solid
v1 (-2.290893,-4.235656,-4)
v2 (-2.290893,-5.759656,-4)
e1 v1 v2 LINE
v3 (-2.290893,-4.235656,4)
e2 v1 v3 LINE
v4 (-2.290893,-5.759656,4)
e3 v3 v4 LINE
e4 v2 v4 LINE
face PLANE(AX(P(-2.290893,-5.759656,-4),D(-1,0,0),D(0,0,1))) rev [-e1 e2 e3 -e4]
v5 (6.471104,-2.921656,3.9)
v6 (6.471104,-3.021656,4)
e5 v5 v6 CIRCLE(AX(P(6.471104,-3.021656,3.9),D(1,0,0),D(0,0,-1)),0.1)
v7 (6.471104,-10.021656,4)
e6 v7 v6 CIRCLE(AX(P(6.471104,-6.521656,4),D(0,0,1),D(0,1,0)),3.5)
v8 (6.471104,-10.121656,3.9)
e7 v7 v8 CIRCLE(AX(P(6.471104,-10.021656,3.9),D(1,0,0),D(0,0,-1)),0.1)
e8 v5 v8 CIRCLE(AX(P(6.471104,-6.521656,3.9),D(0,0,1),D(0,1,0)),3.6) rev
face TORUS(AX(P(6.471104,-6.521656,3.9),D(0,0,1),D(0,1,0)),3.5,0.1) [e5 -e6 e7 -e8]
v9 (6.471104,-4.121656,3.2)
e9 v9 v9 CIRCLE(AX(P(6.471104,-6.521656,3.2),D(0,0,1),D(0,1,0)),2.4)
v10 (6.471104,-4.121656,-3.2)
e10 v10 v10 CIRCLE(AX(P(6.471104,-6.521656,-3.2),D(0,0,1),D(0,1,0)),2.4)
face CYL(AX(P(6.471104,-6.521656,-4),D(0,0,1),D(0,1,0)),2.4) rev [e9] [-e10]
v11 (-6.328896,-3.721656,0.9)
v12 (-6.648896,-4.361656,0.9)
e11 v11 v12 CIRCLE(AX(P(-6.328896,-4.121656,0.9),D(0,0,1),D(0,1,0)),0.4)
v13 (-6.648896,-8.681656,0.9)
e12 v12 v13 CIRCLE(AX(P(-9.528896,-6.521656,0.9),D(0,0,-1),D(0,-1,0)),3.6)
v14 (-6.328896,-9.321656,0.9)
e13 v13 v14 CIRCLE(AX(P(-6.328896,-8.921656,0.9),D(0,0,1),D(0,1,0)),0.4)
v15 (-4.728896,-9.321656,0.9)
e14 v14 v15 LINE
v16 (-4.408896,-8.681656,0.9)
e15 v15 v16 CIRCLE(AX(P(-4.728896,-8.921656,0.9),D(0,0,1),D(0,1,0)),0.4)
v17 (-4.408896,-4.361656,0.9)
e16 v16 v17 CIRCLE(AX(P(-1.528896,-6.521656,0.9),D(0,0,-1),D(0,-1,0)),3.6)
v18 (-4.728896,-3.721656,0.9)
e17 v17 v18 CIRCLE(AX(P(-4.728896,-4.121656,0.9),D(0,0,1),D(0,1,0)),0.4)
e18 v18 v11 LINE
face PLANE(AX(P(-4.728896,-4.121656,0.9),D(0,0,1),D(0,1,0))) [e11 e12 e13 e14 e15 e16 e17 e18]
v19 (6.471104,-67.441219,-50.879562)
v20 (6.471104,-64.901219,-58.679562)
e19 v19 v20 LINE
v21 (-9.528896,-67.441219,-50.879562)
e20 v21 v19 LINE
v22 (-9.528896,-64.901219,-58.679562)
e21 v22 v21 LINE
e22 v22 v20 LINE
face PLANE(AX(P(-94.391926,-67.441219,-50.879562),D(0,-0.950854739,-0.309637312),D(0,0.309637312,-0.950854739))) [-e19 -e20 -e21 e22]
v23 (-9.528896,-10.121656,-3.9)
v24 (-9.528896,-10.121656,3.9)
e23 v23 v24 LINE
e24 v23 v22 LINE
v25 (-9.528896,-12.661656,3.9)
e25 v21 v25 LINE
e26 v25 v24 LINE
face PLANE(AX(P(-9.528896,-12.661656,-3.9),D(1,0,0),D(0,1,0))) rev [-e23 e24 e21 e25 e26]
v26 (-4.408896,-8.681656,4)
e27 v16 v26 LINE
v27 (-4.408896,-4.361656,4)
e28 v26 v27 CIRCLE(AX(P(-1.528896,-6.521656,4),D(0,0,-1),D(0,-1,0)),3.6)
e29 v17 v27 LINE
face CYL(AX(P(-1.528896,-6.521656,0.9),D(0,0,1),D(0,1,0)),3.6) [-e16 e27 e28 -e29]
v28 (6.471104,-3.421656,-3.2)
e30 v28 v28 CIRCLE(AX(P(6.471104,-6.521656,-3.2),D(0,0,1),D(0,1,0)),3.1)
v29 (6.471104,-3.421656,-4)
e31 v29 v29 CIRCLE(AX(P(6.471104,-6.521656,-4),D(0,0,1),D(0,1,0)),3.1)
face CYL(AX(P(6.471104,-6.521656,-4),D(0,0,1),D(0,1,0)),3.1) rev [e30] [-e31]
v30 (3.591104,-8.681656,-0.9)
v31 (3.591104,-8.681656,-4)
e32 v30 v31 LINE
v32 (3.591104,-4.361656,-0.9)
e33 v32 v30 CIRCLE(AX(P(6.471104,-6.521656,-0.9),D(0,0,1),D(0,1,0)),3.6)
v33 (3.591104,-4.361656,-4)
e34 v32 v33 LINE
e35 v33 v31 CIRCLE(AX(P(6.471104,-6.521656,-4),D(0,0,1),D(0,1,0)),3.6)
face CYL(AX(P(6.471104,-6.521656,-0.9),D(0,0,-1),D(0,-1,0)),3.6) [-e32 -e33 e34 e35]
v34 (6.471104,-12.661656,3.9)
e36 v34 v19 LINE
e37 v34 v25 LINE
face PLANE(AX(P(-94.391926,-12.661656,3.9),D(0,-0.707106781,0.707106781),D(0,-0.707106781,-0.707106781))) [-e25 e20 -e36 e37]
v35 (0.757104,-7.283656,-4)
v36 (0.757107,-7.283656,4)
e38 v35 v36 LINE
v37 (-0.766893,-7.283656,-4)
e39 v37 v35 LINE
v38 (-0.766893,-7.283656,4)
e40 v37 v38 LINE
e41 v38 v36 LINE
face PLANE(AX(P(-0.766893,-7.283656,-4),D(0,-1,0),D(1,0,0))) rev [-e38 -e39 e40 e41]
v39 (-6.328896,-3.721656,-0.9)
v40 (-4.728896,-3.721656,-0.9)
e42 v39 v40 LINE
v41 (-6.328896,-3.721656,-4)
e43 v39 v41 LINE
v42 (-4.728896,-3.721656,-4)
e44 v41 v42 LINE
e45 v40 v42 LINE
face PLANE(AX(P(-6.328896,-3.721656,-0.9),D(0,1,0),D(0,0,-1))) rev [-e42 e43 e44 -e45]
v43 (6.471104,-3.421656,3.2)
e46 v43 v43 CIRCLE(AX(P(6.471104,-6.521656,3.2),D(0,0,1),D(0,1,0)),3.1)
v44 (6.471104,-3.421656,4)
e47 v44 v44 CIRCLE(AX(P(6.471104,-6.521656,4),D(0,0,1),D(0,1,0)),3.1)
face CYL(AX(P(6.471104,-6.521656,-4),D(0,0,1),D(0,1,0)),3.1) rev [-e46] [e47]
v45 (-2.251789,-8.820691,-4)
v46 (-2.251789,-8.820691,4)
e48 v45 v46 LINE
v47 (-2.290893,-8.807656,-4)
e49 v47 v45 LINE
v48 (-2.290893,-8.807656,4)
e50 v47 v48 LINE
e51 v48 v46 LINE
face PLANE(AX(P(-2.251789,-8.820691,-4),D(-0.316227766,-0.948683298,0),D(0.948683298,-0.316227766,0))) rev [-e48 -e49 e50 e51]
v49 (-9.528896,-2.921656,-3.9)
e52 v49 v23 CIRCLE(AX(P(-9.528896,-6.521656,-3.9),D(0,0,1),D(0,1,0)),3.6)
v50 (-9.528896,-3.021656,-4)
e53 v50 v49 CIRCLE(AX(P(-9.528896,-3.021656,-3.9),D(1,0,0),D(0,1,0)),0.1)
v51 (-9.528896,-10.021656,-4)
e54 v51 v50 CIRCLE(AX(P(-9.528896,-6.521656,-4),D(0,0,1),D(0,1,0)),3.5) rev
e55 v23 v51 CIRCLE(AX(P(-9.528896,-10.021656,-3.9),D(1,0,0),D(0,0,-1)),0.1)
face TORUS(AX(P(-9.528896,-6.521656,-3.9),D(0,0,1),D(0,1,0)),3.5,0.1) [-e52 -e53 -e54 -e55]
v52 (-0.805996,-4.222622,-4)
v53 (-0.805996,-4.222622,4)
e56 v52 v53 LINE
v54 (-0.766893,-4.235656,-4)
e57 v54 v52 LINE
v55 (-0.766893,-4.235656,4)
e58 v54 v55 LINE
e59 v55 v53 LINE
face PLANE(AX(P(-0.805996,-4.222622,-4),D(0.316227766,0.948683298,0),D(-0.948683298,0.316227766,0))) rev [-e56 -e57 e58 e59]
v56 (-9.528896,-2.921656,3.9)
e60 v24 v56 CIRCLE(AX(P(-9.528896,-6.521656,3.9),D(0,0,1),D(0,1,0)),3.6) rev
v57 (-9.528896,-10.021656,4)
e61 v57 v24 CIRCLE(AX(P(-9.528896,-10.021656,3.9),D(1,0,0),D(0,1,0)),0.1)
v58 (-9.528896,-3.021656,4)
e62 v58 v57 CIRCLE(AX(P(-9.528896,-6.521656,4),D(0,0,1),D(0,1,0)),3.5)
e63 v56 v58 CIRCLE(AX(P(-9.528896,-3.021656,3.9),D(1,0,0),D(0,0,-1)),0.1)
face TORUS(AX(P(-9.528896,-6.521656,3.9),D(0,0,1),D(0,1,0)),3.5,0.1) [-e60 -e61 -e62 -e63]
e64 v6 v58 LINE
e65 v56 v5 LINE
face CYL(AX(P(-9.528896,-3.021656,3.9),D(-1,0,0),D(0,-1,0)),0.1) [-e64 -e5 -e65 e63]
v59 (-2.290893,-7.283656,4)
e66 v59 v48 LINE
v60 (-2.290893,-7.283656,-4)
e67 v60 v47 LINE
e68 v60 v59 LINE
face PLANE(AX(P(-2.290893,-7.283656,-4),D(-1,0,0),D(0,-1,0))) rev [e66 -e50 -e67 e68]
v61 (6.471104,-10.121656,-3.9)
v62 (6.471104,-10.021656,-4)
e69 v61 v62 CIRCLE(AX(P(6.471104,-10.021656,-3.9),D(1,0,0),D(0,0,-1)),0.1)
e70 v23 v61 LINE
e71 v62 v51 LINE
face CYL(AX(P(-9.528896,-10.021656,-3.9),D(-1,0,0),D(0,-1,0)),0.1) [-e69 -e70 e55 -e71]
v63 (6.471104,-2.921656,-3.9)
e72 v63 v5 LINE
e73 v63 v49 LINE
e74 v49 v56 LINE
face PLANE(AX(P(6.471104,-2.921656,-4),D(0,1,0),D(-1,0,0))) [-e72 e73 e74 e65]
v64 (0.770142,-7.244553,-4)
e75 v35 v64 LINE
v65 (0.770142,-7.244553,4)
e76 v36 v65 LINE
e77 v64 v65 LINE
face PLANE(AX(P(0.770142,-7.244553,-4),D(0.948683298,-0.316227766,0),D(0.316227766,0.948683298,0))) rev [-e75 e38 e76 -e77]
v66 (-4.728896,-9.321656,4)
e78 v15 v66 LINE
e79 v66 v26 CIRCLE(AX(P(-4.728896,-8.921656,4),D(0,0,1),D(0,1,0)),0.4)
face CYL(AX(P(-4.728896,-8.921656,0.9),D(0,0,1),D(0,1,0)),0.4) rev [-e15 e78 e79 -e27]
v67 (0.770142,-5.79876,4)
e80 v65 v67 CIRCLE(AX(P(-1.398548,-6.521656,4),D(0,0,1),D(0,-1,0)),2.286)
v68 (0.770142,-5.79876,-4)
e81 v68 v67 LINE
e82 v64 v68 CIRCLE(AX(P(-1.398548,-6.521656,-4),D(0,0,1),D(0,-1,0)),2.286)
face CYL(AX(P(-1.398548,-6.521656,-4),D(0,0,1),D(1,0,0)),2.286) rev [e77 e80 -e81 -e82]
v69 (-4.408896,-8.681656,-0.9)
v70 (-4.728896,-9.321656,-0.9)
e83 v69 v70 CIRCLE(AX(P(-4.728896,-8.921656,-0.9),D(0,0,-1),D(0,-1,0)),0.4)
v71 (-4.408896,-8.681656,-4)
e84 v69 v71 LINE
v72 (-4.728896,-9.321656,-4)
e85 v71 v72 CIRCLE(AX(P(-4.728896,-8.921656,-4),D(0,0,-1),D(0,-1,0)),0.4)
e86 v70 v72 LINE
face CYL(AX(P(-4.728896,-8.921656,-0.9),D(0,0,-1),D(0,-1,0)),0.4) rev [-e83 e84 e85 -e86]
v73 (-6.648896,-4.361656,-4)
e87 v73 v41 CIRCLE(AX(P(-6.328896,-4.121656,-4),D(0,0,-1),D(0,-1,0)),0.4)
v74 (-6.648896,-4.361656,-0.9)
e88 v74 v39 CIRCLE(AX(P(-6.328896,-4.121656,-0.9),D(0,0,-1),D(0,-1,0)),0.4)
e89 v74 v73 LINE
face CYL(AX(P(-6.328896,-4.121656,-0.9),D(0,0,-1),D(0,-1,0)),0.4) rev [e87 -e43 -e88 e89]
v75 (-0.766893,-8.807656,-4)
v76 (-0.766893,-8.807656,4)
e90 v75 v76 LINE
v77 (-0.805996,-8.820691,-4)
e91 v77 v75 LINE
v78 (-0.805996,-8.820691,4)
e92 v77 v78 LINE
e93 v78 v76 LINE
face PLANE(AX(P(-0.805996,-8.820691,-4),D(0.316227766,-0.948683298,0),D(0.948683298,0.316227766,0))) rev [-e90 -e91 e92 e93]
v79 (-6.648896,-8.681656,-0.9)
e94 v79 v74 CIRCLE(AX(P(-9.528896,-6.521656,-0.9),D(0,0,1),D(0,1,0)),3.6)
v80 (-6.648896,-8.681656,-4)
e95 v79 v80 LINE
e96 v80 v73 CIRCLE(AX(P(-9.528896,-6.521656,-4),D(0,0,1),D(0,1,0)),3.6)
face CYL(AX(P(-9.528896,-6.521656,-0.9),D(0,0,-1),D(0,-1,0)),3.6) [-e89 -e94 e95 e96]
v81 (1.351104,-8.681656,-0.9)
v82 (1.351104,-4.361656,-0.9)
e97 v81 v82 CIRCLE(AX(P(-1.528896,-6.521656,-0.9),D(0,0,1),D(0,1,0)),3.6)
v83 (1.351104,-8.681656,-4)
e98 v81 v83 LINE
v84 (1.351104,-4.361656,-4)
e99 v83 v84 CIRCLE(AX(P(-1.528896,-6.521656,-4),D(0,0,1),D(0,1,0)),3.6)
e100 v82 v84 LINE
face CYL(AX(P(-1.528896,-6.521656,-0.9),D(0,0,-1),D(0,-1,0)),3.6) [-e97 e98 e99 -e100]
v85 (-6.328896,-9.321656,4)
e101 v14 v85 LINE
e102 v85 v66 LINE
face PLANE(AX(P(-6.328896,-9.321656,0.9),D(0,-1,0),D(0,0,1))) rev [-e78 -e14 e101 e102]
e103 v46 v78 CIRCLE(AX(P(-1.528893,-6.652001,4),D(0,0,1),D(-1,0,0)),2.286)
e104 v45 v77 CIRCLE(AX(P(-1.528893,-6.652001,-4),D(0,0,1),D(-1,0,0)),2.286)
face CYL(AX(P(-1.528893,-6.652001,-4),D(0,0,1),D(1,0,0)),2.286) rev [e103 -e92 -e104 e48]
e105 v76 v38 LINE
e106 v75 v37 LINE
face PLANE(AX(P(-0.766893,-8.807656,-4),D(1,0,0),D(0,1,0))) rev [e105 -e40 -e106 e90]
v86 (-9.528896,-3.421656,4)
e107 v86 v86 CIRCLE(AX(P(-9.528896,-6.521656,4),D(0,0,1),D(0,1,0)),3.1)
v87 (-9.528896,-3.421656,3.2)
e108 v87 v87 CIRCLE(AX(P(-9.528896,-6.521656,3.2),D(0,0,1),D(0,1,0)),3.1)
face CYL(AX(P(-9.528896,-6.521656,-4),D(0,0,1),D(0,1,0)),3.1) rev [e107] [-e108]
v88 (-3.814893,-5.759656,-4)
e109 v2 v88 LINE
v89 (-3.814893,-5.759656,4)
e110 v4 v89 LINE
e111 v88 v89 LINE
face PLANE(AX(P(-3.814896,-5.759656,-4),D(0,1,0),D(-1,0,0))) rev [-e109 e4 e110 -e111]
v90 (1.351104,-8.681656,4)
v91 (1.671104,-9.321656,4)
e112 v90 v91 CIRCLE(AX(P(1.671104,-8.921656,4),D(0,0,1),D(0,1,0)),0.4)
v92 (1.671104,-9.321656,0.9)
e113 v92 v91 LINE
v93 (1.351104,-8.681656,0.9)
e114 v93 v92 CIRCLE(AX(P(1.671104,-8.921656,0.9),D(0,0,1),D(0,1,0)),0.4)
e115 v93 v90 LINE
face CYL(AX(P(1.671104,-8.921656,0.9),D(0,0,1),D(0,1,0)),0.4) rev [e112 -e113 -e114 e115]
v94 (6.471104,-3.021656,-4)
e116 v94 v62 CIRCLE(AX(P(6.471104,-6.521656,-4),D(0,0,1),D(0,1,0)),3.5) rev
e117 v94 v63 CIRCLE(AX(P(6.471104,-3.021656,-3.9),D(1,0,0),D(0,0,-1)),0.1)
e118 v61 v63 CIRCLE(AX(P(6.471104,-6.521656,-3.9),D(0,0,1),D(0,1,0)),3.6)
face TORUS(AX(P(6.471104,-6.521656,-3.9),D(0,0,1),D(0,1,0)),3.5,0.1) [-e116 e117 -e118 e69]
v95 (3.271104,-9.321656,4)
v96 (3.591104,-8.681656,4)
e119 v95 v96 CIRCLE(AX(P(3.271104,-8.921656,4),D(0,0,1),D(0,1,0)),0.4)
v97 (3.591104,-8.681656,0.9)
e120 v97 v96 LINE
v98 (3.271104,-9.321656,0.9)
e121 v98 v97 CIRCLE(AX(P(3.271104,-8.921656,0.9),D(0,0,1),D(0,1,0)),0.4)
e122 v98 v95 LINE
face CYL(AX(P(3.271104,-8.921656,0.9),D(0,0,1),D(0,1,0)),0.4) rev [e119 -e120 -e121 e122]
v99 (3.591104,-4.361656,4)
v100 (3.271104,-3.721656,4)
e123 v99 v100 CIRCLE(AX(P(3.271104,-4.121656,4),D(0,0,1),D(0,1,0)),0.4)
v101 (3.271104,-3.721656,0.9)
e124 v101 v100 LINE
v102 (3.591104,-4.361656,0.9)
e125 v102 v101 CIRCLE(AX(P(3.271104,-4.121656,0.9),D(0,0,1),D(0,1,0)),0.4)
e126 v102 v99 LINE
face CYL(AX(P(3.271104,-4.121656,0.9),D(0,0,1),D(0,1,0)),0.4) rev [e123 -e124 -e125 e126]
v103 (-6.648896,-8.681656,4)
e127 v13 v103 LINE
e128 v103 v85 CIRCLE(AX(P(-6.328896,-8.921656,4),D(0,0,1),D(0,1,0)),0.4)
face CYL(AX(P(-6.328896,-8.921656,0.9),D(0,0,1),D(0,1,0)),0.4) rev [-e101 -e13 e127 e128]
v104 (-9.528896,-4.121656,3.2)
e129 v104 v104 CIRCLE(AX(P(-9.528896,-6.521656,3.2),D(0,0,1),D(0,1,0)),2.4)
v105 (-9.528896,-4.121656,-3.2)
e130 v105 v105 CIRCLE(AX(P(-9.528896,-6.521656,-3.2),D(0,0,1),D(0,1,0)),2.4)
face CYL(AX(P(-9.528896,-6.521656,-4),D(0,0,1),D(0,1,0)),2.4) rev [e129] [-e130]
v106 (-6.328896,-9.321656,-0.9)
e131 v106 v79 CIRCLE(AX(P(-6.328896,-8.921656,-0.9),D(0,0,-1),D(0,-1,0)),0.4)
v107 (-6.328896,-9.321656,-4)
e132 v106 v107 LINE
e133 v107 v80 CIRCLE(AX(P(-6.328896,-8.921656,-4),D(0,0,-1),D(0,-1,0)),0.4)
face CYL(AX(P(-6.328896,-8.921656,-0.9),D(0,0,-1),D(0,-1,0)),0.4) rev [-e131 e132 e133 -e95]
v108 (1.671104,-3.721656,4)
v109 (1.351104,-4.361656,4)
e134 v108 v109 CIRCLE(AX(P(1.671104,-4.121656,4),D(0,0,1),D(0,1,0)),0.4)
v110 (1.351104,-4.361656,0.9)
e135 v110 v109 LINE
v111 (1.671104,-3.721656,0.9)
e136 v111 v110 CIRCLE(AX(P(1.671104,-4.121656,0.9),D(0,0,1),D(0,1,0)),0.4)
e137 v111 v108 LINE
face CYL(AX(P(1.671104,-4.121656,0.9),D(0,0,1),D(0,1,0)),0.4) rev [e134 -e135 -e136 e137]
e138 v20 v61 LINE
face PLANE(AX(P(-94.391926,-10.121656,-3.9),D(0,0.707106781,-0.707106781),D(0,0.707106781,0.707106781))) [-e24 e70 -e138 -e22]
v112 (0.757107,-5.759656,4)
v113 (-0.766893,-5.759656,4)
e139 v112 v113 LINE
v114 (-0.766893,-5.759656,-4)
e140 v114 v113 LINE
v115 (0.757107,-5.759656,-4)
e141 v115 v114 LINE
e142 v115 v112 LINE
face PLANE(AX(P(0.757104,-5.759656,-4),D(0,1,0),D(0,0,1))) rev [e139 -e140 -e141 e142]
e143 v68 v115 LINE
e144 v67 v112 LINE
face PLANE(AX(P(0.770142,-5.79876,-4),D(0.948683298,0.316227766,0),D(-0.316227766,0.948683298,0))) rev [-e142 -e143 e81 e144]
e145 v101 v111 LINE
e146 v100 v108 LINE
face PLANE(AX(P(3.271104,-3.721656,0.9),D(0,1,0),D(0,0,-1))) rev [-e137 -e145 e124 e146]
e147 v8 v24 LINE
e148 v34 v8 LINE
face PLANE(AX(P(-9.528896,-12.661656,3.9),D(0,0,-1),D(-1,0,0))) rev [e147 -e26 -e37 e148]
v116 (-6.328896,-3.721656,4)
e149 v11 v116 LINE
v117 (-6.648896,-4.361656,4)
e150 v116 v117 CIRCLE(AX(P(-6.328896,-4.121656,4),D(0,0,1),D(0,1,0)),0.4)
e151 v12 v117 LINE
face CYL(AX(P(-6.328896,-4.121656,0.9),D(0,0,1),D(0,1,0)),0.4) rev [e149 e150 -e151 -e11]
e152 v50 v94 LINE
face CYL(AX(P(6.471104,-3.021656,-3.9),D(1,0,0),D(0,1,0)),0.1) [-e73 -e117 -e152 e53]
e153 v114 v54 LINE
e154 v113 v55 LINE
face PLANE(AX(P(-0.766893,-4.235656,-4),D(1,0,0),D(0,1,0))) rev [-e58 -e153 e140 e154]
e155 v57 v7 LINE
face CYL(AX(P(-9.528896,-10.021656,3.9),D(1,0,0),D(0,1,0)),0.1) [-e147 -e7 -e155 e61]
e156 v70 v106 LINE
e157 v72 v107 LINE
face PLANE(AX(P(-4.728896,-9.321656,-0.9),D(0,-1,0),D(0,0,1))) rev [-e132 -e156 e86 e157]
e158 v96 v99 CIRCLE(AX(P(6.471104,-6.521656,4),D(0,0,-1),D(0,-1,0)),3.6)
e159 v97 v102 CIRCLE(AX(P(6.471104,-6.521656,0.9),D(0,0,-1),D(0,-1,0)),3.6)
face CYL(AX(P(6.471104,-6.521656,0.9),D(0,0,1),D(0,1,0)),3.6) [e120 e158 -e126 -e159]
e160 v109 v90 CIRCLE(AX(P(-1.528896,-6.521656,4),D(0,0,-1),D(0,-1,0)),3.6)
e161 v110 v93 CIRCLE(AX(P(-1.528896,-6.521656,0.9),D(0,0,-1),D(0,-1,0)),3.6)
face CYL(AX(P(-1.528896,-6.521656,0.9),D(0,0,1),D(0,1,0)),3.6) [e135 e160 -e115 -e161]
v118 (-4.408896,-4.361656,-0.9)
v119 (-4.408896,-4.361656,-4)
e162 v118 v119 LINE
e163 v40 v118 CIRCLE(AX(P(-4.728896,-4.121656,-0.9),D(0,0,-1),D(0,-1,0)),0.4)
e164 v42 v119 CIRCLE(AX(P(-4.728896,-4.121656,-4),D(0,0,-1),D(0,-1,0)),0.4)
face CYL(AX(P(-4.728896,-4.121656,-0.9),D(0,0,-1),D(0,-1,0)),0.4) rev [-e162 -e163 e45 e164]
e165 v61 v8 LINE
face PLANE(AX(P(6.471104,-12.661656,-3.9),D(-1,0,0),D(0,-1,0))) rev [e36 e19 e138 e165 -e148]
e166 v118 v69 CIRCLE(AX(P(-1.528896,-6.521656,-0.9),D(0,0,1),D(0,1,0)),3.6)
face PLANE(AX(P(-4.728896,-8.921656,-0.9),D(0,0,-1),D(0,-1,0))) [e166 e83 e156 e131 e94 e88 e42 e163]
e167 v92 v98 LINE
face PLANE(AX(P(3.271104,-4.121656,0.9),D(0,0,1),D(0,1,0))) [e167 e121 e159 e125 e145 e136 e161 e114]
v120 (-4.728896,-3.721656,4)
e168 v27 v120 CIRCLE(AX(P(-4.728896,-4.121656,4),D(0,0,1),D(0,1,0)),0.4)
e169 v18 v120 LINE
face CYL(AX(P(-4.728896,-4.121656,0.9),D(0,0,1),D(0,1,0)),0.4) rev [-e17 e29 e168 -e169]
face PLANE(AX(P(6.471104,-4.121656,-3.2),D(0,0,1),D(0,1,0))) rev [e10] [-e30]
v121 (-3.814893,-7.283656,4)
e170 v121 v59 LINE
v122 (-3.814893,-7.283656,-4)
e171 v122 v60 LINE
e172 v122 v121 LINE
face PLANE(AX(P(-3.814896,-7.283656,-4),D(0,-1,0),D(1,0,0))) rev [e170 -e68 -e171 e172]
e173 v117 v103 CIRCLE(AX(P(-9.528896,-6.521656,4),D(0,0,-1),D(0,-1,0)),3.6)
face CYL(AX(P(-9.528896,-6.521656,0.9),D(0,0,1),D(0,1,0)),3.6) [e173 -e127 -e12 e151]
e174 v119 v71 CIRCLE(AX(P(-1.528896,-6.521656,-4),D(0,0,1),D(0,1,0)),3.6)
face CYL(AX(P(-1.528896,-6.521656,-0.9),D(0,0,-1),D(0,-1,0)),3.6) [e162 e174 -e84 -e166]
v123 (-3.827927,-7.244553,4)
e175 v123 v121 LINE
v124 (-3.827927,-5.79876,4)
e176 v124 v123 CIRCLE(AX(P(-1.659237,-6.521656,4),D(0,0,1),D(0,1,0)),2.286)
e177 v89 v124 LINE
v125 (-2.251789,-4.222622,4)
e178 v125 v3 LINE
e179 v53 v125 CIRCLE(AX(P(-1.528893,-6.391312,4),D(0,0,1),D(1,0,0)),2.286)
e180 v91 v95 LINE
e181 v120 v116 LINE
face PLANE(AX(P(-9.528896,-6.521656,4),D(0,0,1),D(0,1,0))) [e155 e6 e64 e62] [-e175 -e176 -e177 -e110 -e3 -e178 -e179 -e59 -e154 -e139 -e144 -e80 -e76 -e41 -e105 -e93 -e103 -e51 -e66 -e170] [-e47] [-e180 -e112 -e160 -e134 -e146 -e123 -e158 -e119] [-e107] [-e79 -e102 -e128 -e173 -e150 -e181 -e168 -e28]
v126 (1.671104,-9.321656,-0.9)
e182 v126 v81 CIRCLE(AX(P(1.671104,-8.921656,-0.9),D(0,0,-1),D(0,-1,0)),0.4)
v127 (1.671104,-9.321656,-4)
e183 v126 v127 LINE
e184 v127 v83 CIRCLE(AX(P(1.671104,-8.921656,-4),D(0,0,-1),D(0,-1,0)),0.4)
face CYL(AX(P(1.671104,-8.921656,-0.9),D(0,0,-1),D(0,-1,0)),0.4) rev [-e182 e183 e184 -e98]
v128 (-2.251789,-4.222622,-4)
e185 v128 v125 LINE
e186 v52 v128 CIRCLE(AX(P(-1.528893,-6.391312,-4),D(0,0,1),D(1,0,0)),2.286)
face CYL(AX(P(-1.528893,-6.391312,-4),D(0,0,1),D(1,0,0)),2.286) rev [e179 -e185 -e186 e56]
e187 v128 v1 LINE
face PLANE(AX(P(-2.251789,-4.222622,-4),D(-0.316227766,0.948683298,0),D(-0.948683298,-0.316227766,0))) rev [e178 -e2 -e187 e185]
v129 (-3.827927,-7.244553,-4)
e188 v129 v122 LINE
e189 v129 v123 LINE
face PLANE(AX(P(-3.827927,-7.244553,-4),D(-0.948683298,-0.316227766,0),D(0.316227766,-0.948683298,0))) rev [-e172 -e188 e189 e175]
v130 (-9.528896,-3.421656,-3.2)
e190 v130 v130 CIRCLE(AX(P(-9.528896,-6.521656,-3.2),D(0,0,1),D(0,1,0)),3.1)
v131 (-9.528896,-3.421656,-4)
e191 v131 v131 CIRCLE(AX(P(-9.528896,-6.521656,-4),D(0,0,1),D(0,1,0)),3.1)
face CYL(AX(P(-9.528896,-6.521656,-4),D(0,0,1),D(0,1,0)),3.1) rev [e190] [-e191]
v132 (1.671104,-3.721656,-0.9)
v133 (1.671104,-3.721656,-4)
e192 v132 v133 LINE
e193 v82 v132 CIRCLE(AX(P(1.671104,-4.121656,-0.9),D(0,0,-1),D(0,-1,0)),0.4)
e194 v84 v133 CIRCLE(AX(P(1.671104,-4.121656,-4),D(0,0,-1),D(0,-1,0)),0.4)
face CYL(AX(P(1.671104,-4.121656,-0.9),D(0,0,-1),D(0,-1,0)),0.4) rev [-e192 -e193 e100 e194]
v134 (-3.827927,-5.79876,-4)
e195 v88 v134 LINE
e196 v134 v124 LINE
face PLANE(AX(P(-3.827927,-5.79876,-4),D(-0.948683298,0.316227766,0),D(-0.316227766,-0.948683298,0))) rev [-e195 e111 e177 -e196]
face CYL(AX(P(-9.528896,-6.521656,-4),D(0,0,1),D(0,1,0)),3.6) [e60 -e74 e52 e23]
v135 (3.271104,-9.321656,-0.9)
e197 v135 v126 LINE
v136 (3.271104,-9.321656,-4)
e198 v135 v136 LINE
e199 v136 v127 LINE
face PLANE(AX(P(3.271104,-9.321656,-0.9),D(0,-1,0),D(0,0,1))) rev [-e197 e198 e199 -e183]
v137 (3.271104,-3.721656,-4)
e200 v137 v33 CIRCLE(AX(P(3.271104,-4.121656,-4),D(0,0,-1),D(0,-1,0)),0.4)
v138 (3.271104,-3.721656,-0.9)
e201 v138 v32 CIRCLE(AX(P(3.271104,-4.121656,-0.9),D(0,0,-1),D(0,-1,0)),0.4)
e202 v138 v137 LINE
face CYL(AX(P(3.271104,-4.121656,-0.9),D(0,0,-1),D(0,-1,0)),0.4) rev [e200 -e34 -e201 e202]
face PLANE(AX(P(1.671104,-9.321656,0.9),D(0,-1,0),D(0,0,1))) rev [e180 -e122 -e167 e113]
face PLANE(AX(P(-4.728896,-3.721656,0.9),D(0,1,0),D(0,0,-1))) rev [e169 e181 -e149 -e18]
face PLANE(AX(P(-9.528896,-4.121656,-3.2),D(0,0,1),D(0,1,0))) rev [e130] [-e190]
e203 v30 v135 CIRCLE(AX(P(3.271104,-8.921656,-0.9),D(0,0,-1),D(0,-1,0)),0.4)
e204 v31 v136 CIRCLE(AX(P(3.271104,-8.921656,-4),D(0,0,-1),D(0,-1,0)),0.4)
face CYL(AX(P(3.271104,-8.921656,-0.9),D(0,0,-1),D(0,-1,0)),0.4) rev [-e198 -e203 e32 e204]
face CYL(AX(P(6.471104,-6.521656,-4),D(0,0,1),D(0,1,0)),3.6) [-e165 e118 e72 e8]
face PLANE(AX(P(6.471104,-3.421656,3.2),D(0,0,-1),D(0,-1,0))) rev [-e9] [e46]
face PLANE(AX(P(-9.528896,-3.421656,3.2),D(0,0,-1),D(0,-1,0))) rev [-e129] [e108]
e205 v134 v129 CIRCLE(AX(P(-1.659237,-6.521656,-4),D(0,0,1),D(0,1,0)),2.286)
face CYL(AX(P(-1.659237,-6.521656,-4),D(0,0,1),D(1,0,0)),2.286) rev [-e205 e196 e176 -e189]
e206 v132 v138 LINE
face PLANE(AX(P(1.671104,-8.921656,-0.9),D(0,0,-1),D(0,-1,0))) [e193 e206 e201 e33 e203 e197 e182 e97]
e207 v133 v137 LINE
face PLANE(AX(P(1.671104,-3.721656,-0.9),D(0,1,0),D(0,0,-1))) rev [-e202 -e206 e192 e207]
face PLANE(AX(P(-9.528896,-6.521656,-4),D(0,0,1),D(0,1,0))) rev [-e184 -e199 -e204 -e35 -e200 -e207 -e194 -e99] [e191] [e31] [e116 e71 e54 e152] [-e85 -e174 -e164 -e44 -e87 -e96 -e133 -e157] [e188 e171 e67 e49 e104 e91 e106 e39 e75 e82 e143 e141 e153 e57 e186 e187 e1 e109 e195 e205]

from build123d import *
from OCP.BRepAlgoAPI import BRepAlgoAPI_Cut
from OCP.TopTools import TopTools_ListOfShape

# Parameters (mm, degrees)
BOSS_EXTRUDE1_DEPTH   = 8
CUT_EXTRUDE2_DEPTH    = 3.1
CUT_EXTRUDE4_DEPTH    = 3.1
CUT_EXTRUDE6_START    = -3.1
CUT_EXTRUDE6_DEPTH    = 3.1
CUT_EXTRUDE7_START    = -3.1
CUT_EXTRUDE7_DEPTH    = 3.1
FILLET1_R             = 0.1
BODY_MOVE_COPY1_ANGLE = 89
BODY_MOVE_COPY3_ANGLE = 1
CUT_EXTRUDE8_DEPTH    = 19.406951047
CUT_EXTRUDE9_DEPTH    = 19.406951047
SKETCH20_W            = 16
SKETCH20_H            = 7.8
BOSS_EXTRUDE2_DEPTH   = 2.54
BOSS_EXTRUDE3_DEPTH   = 16


with BuildPart() as part:
    # Sketch1 → Boss-Extrude1 (new body)
    with BuildSketch(Plane.XY.offset(4)):
        with BuildLine():
            Line((-3.6, 0), (-3.6, -16))
            ThreePointArc((-3.6, -16), (0, -19.6), (3.6, -16))
            Line((3.6, -16), (3.6, 0))
            ThreePointArc((3.6, 0), (0, 3.6), (-3.6, 0))
        make_face()
    extrude(amount=-BOSS_EXTRUDE1_DEPTH)

    # Sketch3 → Cut-Extrude2 (cut)
    with BuildSketch(Plane.XY.offset(4)):
        with BuildLine():
            Line((2.8, -4.8), (2.8, -3.2))
            ThreePointArc((2.8, -3.2), (2.578885438, -2.842229124), (2.16, -2.88))
            ThreePointArc((2.16, -2.88), (0, -3.6), (-2.16, -2.88))
            ThreePointArc((-2.16, -2.88), (-2.578885438, -2.842229124), (-2.8, -3.2))
            Line((-2.8, -3.2), (-2.8, -4.8))
            ThreePointArc((-2.8, -4.8), (-2.578885438, -5.157770876), (-2.16, -5.12))
            ThreePointArc((-2.16, -5.12), (0, -4.4), (2.16, -5.12))
            ThreePointArc((2.16, -5.12), (2.578885438, -5.157770876), (2.8, -4.8))
        make_face()
    extrude(amount=-CUT_EXTRUDE2_DEPTH, mode=Mode.SUBTRACT)

    # Sketch5 → Cut-Extrude4 (cut)
    with BuildSketch(Plane.XY.offset(4)):
        with BuildLine():
            Line((2.8, -12.8), (2.8, -11.2))
            ThreePointArc((2.8, -11.2), (2.578885438, -10.842229124), (2.16, -10.88))
            ThreePointArc((2.16, -10.88), (0, -11.6), (-2.16, -10.88))
            ThreePointArc((-2.16, -10.88), (-2.578885438, -10.842229124), (-2.8, -11.2))
            Line((-2.8, -11.2), (-2.8, -12.8))
            ThreePointArc((-2.8, -12.8), (-2.578885438, -13.157770876), (-2.16, -13.12))
            ThreePointArc((-2.16, -13.12), (0, -12.4), (2.16, -13.12))
            ThreePointArc((2.16, -13.12), (2.578885438, -13.157770876), (2.8, -12.8))
        make_face()
    extrude(amount=-CUT_EXTRUDE4_DEPTH, mode=Mode.SUBTRACT)

    # Sketch7 → Cut-Extrude6 (cut)
    with BuildSketch(Plane(origin=(0, 0, -4), x_dir=(-1, 0, 0), z_dir=(0, 0, -1)).offset(CUT_EXTRUDE6_START)):
        with BuildLine():
            Line((2.8, -4.8), (2.8, -3.2))
            ThreePointArc((2.8, -3.2), (2.578885438, -2.842229124), (2.16, -2.88))
            ThreePointArc((2.16, -2.88), (0, -3.6), (-2.16, -2.88))
            ThreePointArc((-2.16, -2.88), (-2.578885438, -2.842229124), (-2.8, -3.2))
            Line((-2.8, -3.2), (-2.8, -4.8))
            ThreePointArc((-2.8, -4.8), (-2.578885438, -5.157770876), (-2.16, -5.12))
            ThreePointArc((-2.16, -5.12), (0, -4.4), (2.16, -5.12))
            ThreePointArc((2.16, -5.12), (2.578885438, -5.157770876), (2.8, -4.8))
        make_face()
    extrude(amount=CUT_EXTRUDE6_DEPTH, mode=Mode.SUBTRACT)

    # Sketch8 → Cut-Extrude7 (cut)
    with BuildSketch(Plane(origin=(0, 0, -4), x_dir=(-1, 0, 0), z_dir=(0, 0, -1)).offset(CUT_EXTRUDE7_START)):
        with BuildLine():
            Line((-2.8, -11.2), (-2.8, -12.8))
            ThreePointArc((-2.8, -12.8), (-2.578885438, -13.157770876), (-2.16, -13.12))
            ThreePointArc((-2.16, -13.12), (0, -12.4), (2.16, -13.12))
            ThreePointArc((2.16, -13.12), (2.578885438, -13.157770876), (2.8, -12.8))
            Line((2.8, -12.8), (2.8, -11.2))
            ThreePointArc((2.8, -11.2), (2.578885438, -10.842229124), (2.16, -10.88))
            ThreePointArc((2.16, -10.88), (0, -11.6), (-2.16, -10.88))
            ThreePointArc((-2.16, -10.88), (-2.578885438, -10.842229124), (-2.8, -11.2))
        make_face()
    extrude(amount=CUT_EXTRUDE7_DEPTH, mode=Mode.SUBTRACT)

    # Sketch10 → Cut-Revolve1 (revolve, cut)
    with BuildSketch(Plane(origin=(0, -16, 0), x_dir=(1, 0, 0), z_dir=(0, 1, 0))):
        Polygon((3.1, 4), (0, 4), (0, -4), (3.1, -4), (3.1, -3.2), (2.4, -3.2), (2.4, 3.2), (3.1, 3.2), align=None)
    revolve(axis=Axis((0, -16, -4), (0, 0, 1)), mode=Mode.SUBTRACT)

    # Sketch13 → Cut-Revolve4 (revolve, cut)
    with BuildSketch(Plane(origin=(0, 0, 0), x_dir=(1, 0, 0), z_dir=(0, 1, 0))):
        Polygon((3.1, 4), (0, 4), (0, -4), (3.1, -4), (3.1, -3.2), (2.4, -3.2), (2.4, 3.2), (3.1, 3.2), align=None)
    revolve(axis=Axis((0, 0, -4), (0, 0, 1)), mode=Mode.SUBTRACT)

    # Fillet1
    fillet1_edges = [part.edges().sort_by_distance(p)[0] for p in [
        (0, -19.6, -4),
        (3.6, -8, -4),
        (0, 3.6, -4),
        (3.6, -8, 4),
        (0, -19.6, 4),
        (-3.6, -8, 4),
        (0, 3.6, 4),
        (-3.6, -8, -4),
    ]]
    fillet(fillet1_edges, radius=FILLET1_R)


with BuildPart() as part_1:
    # Body-Move/Copy1: moved
    add(part.part.rotate(Axis((-1.61875778, -8, 0), (0, 0, 1)), BODY_MOVE_COPY1_ANGLE))


with BuildPart() as part_2:
    # Body-Move/Copy3: read off the stored shape, not the designer's step
    # Body-Move/Copy3: moved
    add(part_1.part.moved(Location((-0.0519755, -0.1124913, 0))).rotate(Axis((0, 0, 0), (0, 0, 1)), BODY_MOVE_COPY3_ANGLE))

    # Sketch14 → Cut-Extrude8 (cut, through all)
    with BuildSketch(Plane.XY.offset(4)):
        Polygon((-3.814896337, -5.759656314), (-3.814896337, -7.283656314), (-2.290892666, -7.283656314), (-2.290892666, -8.807656314), (-0.766892666, -8.807656314), (-0.766892666, -7.283656314), (0.757103663, -7.283656314), (0.757103663, -5.759656314), (-0.766892666, -5.759656314), (-0.766892666, -4.235656314), (-2.290892666, -4.235656314), (-2.290892666, -5.759656314), align=None)
    extrude(amount=-CUT_EXTRUDE8_DEPTH, mode=Mode.SUBTRACT)

    # Sketch15 → Cut-Extrude9 (cut, through all)
    with BuildSketch(Plane.XY.offset(4)):
        with BuildLine():
            Line((-2.290892666, -4.235656314), (-0.766892666, -4.235656314))
            Line((-0.766892666, -4.235656314), (-0.805995992, -4.222621872))
            ThreePointArc((-0.805995992, -4.222621872), (-1.528892666, -4.105311891), (-2.251789339, -4.222621872))
            Line((-2.251789339, -4.222621872), (-2.290892666, -4.235656314))
        make_face()
    extrude(amount=-CUT_EXTRUDE9_DEPTH, mode=Mode.SUBTRACT)


with BuildPart() as cirpattern1_tool:
    # CirPattern1: read off the stored shape, not the designer's step
    # CirPattern1: loft between two sections, ruled curve by curve
    cirpattern1_from = [
        Edge.make_three_point_arc((-3.827927108, -5.798759641, -4), (-3.945237088, -6.521656314, -4), (-3.827927108, -7.244552987, -4)),
        Edge.make_line((-3.827927108, -7.244552987, -4), (-3.814892666, -7.283656314, -4)),
        Edge.make_line((-3.827927108, -5.798759641, -4), (-3.814892666, -5.759656314, -4)),
        Edge.make_line((-3.814892666, -5.759656314, -4), (-3.814892666, -7.283656314, -4)),
    ]
    cirpattern1_to = [
        Edge.make_three_point_arc((-3.827927108, -5.798759641, 4), (-3.945237088, -6.521656314, 4), (-3.827927108, -7.244552987, 4)),
        Edge.make_line((-3.827927108, -7.244552987, 4), (-3.814892666, -7.283656314, 4)),
        Edge.make_line((-3.827927108, -5.798759641, 4), (-3.814892666, -5.759656314, 4)),
        Edge.make_line((-3.814892666, -5.759656314, 4), (-3.814892666, -7.283656314, 4)),
    ]
    cirpattern1 = Solid(Shell([*[Face.make_surface_from_curves(cirpattern1_from[k], cirpattern1_to[k]) for k in range(4)], Face(Wire(cirpattern1_from)), Face(Wire(cirpattern1_to))]))
    add(cirpattern1)


with BuildPart() as part_3:
    add(part_2.part)

    # CirPattern1: cut by cirpattern1_tool, with a tolerance
    cirpattern1_stock = TopTools_ListOfShape()
    cirpattern1_stock.Append(part_3.part.wrapped)
    cirpattern1_tools = TopTools_ListOfShape()
    cirpattern1_tools.Append(cirpattern1_tool.part.wrapped)
    cirpattern1_cut = BRepAlgoAPI_Cut()
    cirpattern1_cut.SetArguments(cirpattern1_stock)
    cirpattern1_cut.SetTools(cirpattern1_tools)
    cirpattern1_cut.SetFuzzyValue(0.00001)
    cirpattern1_cut.Build()
    add(Compound.cast(cirpattern1_cut.Shape()).solids(), mode=Mode.REPLACE)


with BuildPart() as cirpattern1_2_tool:
    # CirPattern1 2: loft between two sections, ruled curve by curve
    cirpattern1_2_from = [
        Edge.make_three_point_arc((-2.251789339, -8.820690756, -4), (-1.528892666, -8.938000737, -4), (-0.805995992, -8.820690756, -4)),
        Edge.make_line((-0.766892666, -8.807656314, -4), (-0.805995992, -8.820690756, -4)),
        Edge.make_line((-2.251789339, -8.820690756, -4), (-2.290892666, -8.807656314, -4)),
        Edge.make_line((-2.290892666, -8.807656314, -4), (-0.766892666, -8.807656314, -4)),
    ]
    cirpattern1_2_to = [
        Edge.make_three_point_arc((-2.251789339, -8.820690756, 4), (-1.528892666, -8.938000737, 4), (-0.805995992, -8.820690756, 4)),
        Edge.make_line((-0.766892666, -8.807656314, 4), (-0.805995992, -8.820690756, 4)),
        Edge.make_line((-2.251789339, -8.820690756, 4), (-2.290892666, -8.807656314, 4)),
        Edge.make_line((-2.290892666, -8.807656314, 4), (-0.766892666, -8.807656314, 4)),
    ]
    cirpattern1_2 = Solid(Shell([*[Face.make_surface_from_curves(cirpattern1_2_from[k], cirpattern1_2_to[k]) for k in range(4)], Face(Wire(cirpattern1_2_from)), Face(Wire(cirpattern1_2_to))]))
    add(cirpattern1_2)


with BuildPart() as part_4:
    add(part_3.part)

    # CirPattern1 2: cut by cirpattern1_2_tool, with a tolerance
    cirpattern1_2_stock = TopTools_ListOfShape()
    cirpattern1_2_stock.Append(part_4.part.wrapped)
    cirpattern1_2_tools = TopTools_ListOfShape()
    cirpattern1_2_tools.Append(cirpattern1_2_tool.part.wrapped)
    cirpattern1_2_cut = BRepAlgoAPI_Cut()
    cirpattern1_2_cut.SetArguments(cirpattern1_2_stock)
    cirpattern1_2_cut.SetTools(cirpattern1_2_tools)
    cirpattern1_2_cut.SetFuzzyValue(0.00001)
    cirpattern1_2_cut.Build()
    add(Compound.cast(cirpattern1_2_cut.Shape()).solids(), mode=Mode.REPLACE)


with BuildPart() as cirpattern1_3_tool:
    # CirPattern1 3: loft between two sections, ruled curve by curve
    cirpattern1_3_from = [
        Edge.make_three_point_arc((0.770141777, -7.244552987, -4), (0.887451757, -6.521656314, -4), (0.770141777, -5.798759641, -4)),
        Edge.make_line((0.757107334, -5.759656314, -4), (0.770141777, -5.798759641, -4)),
        Edge.make_line((0.770141777, -7.244552987, -4), (0.757103663, -7.283656314, -4)),
        Edge.make_line((0.757103663, -7.283656314, -4), (0.757107334, -5.759656314, -4)),
    ]
    cirpattern1_3_to = [
        Edge.make_three_point_arc((0.770141777, -7.244552987, 4), (0.887451757, -6.521656314, 4), (0.770141777, -5.798759641, 4)),
        Edge.make_line((0.757107334, -5.759656314, 4), (0.770141777, -5.798759641, 4)),
        Edge.make_line((0.770141777, -7.244552987, 4), (0.757107334, -7.283656314, 4)),
        Edge.make_line((0.757107334, -7.283656314, 4), (0.757107334, -5.759656314, 4)),
    ]
    cirpattern1_3 = Solid(Shell([*[Face.make_surface_from_curves(cirpattern1_3_from[k], cirpattern1_3_to[k]) for k in range(4)], Face(Wire(cirpattern1_3_from)), Face(Wire(cirpattern1_3_to))]))
    add(cirpattern1_3)


with BuildPart() as part_5:
    add(part_4.part)

    # CirPattern1 3: cut by cirpattern1_3_tool, with a tolerance
    cirpattern1_3_stock = TopTools_ListOfShape()
    cirpattern1_3_stock.Append(part_5.part.wrapped)
    cirpattern1_3_tools = TopTools_ListOfShape()
    cirpattern1_3_tools.Append(cirpattern1_3_tool.part.wrapped)
    cirpattern1_3_cut = BRepAlgoAPI_Cut()
    cirpattern1_3_cut.SetArguments(cirpattern1_3_stock)
    cirpattern1_3_cut.SetTools(cirpattern1_3_tools)
    cirpattern1_3_cut.SetFuzzyValue(0.00001)
    cirpattern1_3_cut.Build()
    add(Compound.cast(cirpattern1_3_cut.Shape()).solids(), mode=Mode.REPLACE)

    # Sketch20 → Boss-Extrude2 (add)
    with BuildSketch(Plane.XZ.offset(10.121656314)):
        with Locations((-1.528896337, 0)):
            Rectangle(SKETCH20_W, SKETCH20_H)
    extrude(amount=BOSS_EXTRUDE2_DEPTH)

    # Sketch23 → Boss-Extrude3 (add)
    with BuildSketch(Plane(origin=(6.471103663, 0, 0), x_dir=(0, 0, -1), z_dir=(1, 0, 0))):
        Polygon((-3.9, -12.661656314), (50.879562339, -67.441218652), (58.679562339, -64.901218652), (3.9, -10.121656314), align=None)
    extrude(amount=-BOSS_EXTRUDE3_DEPTH)


solid = part_5.part
